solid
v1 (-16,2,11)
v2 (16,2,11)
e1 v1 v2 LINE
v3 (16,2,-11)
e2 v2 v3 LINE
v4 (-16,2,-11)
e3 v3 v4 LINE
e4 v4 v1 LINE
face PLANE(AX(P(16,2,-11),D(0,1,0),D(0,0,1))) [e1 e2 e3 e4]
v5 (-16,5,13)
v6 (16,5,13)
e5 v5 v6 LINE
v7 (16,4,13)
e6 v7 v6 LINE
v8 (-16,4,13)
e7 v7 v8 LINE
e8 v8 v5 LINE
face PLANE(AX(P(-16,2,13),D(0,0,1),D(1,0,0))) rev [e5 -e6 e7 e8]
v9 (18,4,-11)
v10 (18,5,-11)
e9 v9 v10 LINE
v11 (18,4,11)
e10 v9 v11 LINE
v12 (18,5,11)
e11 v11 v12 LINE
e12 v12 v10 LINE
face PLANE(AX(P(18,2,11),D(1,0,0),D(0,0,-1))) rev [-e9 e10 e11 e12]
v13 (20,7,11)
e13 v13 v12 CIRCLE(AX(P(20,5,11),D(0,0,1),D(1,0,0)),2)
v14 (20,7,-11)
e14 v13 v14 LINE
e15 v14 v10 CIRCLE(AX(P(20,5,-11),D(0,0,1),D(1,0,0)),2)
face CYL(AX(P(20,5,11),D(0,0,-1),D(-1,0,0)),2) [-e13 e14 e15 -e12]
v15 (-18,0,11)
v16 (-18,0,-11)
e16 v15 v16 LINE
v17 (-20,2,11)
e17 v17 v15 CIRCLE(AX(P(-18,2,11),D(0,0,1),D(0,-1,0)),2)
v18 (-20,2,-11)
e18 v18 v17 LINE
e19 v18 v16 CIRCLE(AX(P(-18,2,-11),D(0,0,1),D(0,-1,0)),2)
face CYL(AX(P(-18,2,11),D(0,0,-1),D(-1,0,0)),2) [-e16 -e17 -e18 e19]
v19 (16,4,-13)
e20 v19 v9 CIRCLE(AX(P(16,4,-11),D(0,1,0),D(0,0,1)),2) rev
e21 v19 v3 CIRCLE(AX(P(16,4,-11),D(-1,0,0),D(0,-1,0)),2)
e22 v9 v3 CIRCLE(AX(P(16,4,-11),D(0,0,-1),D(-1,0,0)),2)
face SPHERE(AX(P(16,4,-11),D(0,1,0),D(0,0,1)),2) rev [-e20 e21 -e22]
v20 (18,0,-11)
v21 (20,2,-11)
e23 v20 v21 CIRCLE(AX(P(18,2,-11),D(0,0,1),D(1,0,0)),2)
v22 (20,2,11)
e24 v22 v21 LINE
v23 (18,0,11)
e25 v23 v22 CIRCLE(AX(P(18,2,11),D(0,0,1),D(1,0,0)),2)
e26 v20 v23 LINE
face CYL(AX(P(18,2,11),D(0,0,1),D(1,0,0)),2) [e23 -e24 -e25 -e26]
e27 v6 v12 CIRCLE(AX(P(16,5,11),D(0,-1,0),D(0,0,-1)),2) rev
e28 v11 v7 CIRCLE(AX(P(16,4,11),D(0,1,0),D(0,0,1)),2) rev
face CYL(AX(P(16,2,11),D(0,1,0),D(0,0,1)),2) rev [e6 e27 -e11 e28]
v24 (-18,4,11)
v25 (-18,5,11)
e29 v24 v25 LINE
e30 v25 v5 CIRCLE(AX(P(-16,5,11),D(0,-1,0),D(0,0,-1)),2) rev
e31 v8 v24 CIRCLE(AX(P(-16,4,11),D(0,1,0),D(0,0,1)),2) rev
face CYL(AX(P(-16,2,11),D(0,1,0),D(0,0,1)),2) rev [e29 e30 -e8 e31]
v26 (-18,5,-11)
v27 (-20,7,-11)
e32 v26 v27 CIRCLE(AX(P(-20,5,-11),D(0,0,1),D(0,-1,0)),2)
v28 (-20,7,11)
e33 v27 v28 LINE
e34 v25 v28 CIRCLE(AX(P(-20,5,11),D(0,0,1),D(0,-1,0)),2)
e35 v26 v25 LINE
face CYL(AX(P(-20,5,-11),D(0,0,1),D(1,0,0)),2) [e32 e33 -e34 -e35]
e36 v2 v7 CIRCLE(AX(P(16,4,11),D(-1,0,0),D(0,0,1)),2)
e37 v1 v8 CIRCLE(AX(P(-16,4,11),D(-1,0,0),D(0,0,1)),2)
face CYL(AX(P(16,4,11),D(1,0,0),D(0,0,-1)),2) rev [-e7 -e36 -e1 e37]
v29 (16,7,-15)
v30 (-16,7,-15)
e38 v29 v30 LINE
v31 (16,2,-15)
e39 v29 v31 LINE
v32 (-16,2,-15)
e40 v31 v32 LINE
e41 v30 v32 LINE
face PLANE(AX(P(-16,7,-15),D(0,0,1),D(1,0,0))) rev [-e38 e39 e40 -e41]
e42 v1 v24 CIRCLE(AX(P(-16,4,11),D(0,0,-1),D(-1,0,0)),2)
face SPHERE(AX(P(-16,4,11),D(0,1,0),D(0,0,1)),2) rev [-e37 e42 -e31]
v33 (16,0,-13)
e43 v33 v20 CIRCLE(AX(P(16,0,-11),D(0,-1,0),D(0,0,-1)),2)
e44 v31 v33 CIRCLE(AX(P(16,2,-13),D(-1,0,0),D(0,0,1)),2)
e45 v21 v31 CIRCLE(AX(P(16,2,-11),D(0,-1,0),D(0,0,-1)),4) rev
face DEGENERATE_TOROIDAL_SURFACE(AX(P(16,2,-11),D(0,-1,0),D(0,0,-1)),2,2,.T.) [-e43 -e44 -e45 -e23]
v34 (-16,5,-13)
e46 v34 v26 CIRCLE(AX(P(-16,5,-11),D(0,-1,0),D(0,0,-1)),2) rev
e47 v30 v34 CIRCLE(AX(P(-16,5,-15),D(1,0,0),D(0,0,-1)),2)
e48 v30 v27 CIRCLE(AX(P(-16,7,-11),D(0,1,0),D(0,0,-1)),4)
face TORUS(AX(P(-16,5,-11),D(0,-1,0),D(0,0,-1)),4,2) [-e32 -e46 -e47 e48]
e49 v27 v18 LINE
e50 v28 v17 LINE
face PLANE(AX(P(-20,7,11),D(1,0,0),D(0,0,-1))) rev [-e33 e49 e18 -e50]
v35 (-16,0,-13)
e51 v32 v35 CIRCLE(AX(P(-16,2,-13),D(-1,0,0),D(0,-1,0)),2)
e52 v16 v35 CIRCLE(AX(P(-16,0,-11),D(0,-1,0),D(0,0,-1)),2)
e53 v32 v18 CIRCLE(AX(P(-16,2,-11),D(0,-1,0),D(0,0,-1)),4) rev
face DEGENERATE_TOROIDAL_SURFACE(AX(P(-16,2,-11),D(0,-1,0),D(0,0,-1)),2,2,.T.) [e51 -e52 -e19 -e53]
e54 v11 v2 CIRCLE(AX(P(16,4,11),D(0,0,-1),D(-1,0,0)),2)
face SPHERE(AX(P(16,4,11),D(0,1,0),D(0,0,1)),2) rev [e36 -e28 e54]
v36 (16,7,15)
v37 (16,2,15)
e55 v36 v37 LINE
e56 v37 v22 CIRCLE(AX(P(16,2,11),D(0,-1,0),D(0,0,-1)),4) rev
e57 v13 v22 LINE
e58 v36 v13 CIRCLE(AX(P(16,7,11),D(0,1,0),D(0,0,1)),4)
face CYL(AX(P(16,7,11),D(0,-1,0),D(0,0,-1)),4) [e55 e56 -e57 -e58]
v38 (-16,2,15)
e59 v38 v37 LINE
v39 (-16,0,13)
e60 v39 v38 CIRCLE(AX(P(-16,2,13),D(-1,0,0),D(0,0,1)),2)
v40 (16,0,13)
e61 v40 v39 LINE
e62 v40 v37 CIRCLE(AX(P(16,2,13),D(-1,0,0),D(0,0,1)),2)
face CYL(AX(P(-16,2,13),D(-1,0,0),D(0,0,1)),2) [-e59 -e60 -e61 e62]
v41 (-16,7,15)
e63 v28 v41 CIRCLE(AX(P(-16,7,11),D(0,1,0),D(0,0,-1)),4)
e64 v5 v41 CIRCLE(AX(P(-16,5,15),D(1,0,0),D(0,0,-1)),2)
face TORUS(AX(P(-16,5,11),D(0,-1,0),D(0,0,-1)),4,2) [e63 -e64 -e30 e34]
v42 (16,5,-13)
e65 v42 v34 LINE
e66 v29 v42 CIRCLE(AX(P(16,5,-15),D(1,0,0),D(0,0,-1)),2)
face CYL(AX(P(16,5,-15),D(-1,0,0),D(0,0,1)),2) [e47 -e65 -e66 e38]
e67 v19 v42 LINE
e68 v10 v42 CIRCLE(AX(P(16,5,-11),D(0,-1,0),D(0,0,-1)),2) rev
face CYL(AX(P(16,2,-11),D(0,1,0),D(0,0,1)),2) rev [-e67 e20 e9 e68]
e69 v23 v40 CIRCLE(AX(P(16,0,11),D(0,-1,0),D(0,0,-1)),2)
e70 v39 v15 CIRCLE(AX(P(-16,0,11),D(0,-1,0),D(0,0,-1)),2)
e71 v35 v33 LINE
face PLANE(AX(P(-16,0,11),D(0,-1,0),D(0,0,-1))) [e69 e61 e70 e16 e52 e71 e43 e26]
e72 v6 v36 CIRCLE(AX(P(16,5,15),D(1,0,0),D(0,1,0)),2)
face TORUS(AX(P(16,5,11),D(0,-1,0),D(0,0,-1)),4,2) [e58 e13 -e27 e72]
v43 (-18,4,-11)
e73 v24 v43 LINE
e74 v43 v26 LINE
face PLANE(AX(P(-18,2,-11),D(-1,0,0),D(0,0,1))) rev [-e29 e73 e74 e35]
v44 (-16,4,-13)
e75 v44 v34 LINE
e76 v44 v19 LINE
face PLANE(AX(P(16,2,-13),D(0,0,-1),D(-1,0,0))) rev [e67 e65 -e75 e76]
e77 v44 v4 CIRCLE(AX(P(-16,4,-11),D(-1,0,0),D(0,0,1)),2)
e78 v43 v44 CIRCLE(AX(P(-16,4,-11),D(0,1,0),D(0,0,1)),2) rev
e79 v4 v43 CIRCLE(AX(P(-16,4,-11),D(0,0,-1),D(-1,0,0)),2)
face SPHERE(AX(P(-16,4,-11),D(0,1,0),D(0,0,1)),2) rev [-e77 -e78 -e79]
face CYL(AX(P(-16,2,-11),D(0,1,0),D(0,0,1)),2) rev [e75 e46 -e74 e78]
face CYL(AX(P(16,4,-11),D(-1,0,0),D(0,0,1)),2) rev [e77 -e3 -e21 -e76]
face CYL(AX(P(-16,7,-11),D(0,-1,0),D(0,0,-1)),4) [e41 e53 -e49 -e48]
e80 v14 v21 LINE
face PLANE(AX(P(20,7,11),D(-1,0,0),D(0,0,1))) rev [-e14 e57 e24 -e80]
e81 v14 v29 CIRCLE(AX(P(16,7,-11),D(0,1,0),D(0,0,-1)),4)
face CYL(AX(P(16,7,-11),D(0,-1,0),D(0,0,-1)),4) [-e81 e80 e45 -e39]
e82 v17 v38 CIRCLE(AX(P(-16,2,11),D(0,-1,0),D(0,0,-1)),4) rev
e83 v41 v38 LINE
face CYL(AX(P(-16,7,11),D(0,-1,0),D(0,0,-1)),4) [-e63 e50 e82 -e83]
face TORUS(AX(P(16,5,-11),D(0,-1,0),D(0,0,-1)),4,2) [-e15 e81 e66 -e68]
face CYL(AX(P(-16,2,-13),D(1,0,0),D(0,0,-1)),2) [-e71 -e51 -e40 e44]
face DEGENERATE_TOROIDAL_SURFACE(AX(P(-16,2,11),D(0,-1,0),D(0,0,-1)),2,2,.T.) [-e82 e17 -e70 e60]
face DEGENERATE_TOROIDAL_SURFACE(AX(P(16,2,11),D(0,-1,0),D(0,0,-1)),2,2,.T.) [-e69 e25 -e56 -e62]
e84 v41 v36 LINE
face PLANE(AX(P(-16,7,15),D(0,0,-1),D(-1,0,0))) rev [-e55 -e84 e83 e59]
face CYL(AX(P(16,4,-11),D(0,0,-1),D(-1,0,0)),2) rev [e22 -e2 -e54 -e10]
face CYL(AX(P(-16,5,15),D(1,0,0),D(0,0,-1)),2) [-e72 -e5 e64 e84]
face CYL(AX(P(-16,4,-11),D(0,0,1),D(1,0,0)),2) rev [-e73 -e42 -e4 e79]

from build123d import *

# Parameters (mm, degrees)
BOSS_EXTRU_1_DEPTH      = 7
ENL_V_MAT_EXTRU_1_DEPTH = 5
CONG_1_R                = 2
CONG_2_R                = 2
CONG_3_R                = 2


with BuildPart() as part:
    # Esquisse1 → Boss.-Extru.1 (new body)
    with BuildSketch(Plane(origin=(0, 0, 0), x_dir=(1, 0, 0), z_dir=(0, 1, 0))):
        with BuildLine():
            Line((-16, -15), (16, -15))
            ThreePointArc((16, -15), (18.828427125, -13.828427125), (20, -11))
            Line((20, -11), (20, 11))
            ThreePointArc((20, 11), (18.828427125, 13.828427125), (16, 15))
            Line((16, 15), (-16, 15))
            ThreePointArc((-16, 15), (-18.828427125, 13.828427125), (-20, 11))
            Line((-20, 11), (-20, -11))
            ThreePointArc((-20, -11), (-18.828427125, -13.828427125), (-16, -15))
        make_face()
    extrude(amount=BOSS_EXTRU_1_DEPTH)

    # Esquisse2 → Enlèv. mat.-Extru.1 (cut)
    with BuildSketch(Plane(origin=(0, 7, 0), x_dir=(1, 0, 0), z_dir=(0, 1, 0))):
        with BuildLine():
            Line((18, -11), (18, 11))
            ThreePointArc((18, 11), (17.414213562, 12.414213562), (16, 13))
            Line((16, 13), (-16, 13))
            ThreePointArc((-16, 13), (-17.414213562, 12.414213562), (-18, 11))
            Line((-18, 11), (-18, -11))
            ThreePointArc((-18, -11), (-17.414213562, -12.414213562), (-16, -13))
            Line((-16, -13), (16, -13))
            ThreePointArc((16, -13), (17.414213562, -12.414213562), (18, -11))
        make_face()
    extrude(amount=-ENL_V_MAT_EXTRU_1_DEPTH, mode=Mode.SUBTRACT)

    # Congé1
    cong_1_edges = [part.edges().sort_by_distance(p)[0] for p in [
        (17.414213562, 2, -12.414213562),
        (18, 2, 0),
        (17.414213562, 2, 12.414213562),
        (0, 2, 13),
        (-17.414213562, 2, 12.414213562),
        (-18, 2, 0),
        (-17.414213562, 2, -12.414213562),
        (0, 2, -13),
    ]]
    fillet(cong_1_edges, radius=CONG_1_R)

    # Congé2
    cong_2_edges = [part.edges().sort_by_distance(p)[0] for p in [
        (0, 0, 15),
        (-18.828427125, 0, 13.828427125),
        (-20, 0, 0),
        (-18.828427125, 0, -13.828427125),
        (0, 0, -15),
        (18.828427125, 0, -13.828427125),
        (20, 0, 0),
        (18.828427125, 0, 13.828427125),
    ]]
    fillet(cong_2_edges, radius=CONG_2_R)

    # Congé3
    cong_3_edges = [part.edges().sort_by_distance(p)[0] for p in [
        (17.414213562, 7, -12.414213562),
        (0, 7, -13),
        (-17.414213562, 7, -12.414213562),
        (-18, 7, 0),
        (-17.414213562, 7, 12.414213562),
        (0, 7, 13),
        (17.414213562, 7, 12.414213562),
        (18, 7, 0),
    ]]
    fillet(cong_3_edges, radius=CONG_3_R - 0.0001)  # a hair under: the kernel refuses the full size


solid = part.part
